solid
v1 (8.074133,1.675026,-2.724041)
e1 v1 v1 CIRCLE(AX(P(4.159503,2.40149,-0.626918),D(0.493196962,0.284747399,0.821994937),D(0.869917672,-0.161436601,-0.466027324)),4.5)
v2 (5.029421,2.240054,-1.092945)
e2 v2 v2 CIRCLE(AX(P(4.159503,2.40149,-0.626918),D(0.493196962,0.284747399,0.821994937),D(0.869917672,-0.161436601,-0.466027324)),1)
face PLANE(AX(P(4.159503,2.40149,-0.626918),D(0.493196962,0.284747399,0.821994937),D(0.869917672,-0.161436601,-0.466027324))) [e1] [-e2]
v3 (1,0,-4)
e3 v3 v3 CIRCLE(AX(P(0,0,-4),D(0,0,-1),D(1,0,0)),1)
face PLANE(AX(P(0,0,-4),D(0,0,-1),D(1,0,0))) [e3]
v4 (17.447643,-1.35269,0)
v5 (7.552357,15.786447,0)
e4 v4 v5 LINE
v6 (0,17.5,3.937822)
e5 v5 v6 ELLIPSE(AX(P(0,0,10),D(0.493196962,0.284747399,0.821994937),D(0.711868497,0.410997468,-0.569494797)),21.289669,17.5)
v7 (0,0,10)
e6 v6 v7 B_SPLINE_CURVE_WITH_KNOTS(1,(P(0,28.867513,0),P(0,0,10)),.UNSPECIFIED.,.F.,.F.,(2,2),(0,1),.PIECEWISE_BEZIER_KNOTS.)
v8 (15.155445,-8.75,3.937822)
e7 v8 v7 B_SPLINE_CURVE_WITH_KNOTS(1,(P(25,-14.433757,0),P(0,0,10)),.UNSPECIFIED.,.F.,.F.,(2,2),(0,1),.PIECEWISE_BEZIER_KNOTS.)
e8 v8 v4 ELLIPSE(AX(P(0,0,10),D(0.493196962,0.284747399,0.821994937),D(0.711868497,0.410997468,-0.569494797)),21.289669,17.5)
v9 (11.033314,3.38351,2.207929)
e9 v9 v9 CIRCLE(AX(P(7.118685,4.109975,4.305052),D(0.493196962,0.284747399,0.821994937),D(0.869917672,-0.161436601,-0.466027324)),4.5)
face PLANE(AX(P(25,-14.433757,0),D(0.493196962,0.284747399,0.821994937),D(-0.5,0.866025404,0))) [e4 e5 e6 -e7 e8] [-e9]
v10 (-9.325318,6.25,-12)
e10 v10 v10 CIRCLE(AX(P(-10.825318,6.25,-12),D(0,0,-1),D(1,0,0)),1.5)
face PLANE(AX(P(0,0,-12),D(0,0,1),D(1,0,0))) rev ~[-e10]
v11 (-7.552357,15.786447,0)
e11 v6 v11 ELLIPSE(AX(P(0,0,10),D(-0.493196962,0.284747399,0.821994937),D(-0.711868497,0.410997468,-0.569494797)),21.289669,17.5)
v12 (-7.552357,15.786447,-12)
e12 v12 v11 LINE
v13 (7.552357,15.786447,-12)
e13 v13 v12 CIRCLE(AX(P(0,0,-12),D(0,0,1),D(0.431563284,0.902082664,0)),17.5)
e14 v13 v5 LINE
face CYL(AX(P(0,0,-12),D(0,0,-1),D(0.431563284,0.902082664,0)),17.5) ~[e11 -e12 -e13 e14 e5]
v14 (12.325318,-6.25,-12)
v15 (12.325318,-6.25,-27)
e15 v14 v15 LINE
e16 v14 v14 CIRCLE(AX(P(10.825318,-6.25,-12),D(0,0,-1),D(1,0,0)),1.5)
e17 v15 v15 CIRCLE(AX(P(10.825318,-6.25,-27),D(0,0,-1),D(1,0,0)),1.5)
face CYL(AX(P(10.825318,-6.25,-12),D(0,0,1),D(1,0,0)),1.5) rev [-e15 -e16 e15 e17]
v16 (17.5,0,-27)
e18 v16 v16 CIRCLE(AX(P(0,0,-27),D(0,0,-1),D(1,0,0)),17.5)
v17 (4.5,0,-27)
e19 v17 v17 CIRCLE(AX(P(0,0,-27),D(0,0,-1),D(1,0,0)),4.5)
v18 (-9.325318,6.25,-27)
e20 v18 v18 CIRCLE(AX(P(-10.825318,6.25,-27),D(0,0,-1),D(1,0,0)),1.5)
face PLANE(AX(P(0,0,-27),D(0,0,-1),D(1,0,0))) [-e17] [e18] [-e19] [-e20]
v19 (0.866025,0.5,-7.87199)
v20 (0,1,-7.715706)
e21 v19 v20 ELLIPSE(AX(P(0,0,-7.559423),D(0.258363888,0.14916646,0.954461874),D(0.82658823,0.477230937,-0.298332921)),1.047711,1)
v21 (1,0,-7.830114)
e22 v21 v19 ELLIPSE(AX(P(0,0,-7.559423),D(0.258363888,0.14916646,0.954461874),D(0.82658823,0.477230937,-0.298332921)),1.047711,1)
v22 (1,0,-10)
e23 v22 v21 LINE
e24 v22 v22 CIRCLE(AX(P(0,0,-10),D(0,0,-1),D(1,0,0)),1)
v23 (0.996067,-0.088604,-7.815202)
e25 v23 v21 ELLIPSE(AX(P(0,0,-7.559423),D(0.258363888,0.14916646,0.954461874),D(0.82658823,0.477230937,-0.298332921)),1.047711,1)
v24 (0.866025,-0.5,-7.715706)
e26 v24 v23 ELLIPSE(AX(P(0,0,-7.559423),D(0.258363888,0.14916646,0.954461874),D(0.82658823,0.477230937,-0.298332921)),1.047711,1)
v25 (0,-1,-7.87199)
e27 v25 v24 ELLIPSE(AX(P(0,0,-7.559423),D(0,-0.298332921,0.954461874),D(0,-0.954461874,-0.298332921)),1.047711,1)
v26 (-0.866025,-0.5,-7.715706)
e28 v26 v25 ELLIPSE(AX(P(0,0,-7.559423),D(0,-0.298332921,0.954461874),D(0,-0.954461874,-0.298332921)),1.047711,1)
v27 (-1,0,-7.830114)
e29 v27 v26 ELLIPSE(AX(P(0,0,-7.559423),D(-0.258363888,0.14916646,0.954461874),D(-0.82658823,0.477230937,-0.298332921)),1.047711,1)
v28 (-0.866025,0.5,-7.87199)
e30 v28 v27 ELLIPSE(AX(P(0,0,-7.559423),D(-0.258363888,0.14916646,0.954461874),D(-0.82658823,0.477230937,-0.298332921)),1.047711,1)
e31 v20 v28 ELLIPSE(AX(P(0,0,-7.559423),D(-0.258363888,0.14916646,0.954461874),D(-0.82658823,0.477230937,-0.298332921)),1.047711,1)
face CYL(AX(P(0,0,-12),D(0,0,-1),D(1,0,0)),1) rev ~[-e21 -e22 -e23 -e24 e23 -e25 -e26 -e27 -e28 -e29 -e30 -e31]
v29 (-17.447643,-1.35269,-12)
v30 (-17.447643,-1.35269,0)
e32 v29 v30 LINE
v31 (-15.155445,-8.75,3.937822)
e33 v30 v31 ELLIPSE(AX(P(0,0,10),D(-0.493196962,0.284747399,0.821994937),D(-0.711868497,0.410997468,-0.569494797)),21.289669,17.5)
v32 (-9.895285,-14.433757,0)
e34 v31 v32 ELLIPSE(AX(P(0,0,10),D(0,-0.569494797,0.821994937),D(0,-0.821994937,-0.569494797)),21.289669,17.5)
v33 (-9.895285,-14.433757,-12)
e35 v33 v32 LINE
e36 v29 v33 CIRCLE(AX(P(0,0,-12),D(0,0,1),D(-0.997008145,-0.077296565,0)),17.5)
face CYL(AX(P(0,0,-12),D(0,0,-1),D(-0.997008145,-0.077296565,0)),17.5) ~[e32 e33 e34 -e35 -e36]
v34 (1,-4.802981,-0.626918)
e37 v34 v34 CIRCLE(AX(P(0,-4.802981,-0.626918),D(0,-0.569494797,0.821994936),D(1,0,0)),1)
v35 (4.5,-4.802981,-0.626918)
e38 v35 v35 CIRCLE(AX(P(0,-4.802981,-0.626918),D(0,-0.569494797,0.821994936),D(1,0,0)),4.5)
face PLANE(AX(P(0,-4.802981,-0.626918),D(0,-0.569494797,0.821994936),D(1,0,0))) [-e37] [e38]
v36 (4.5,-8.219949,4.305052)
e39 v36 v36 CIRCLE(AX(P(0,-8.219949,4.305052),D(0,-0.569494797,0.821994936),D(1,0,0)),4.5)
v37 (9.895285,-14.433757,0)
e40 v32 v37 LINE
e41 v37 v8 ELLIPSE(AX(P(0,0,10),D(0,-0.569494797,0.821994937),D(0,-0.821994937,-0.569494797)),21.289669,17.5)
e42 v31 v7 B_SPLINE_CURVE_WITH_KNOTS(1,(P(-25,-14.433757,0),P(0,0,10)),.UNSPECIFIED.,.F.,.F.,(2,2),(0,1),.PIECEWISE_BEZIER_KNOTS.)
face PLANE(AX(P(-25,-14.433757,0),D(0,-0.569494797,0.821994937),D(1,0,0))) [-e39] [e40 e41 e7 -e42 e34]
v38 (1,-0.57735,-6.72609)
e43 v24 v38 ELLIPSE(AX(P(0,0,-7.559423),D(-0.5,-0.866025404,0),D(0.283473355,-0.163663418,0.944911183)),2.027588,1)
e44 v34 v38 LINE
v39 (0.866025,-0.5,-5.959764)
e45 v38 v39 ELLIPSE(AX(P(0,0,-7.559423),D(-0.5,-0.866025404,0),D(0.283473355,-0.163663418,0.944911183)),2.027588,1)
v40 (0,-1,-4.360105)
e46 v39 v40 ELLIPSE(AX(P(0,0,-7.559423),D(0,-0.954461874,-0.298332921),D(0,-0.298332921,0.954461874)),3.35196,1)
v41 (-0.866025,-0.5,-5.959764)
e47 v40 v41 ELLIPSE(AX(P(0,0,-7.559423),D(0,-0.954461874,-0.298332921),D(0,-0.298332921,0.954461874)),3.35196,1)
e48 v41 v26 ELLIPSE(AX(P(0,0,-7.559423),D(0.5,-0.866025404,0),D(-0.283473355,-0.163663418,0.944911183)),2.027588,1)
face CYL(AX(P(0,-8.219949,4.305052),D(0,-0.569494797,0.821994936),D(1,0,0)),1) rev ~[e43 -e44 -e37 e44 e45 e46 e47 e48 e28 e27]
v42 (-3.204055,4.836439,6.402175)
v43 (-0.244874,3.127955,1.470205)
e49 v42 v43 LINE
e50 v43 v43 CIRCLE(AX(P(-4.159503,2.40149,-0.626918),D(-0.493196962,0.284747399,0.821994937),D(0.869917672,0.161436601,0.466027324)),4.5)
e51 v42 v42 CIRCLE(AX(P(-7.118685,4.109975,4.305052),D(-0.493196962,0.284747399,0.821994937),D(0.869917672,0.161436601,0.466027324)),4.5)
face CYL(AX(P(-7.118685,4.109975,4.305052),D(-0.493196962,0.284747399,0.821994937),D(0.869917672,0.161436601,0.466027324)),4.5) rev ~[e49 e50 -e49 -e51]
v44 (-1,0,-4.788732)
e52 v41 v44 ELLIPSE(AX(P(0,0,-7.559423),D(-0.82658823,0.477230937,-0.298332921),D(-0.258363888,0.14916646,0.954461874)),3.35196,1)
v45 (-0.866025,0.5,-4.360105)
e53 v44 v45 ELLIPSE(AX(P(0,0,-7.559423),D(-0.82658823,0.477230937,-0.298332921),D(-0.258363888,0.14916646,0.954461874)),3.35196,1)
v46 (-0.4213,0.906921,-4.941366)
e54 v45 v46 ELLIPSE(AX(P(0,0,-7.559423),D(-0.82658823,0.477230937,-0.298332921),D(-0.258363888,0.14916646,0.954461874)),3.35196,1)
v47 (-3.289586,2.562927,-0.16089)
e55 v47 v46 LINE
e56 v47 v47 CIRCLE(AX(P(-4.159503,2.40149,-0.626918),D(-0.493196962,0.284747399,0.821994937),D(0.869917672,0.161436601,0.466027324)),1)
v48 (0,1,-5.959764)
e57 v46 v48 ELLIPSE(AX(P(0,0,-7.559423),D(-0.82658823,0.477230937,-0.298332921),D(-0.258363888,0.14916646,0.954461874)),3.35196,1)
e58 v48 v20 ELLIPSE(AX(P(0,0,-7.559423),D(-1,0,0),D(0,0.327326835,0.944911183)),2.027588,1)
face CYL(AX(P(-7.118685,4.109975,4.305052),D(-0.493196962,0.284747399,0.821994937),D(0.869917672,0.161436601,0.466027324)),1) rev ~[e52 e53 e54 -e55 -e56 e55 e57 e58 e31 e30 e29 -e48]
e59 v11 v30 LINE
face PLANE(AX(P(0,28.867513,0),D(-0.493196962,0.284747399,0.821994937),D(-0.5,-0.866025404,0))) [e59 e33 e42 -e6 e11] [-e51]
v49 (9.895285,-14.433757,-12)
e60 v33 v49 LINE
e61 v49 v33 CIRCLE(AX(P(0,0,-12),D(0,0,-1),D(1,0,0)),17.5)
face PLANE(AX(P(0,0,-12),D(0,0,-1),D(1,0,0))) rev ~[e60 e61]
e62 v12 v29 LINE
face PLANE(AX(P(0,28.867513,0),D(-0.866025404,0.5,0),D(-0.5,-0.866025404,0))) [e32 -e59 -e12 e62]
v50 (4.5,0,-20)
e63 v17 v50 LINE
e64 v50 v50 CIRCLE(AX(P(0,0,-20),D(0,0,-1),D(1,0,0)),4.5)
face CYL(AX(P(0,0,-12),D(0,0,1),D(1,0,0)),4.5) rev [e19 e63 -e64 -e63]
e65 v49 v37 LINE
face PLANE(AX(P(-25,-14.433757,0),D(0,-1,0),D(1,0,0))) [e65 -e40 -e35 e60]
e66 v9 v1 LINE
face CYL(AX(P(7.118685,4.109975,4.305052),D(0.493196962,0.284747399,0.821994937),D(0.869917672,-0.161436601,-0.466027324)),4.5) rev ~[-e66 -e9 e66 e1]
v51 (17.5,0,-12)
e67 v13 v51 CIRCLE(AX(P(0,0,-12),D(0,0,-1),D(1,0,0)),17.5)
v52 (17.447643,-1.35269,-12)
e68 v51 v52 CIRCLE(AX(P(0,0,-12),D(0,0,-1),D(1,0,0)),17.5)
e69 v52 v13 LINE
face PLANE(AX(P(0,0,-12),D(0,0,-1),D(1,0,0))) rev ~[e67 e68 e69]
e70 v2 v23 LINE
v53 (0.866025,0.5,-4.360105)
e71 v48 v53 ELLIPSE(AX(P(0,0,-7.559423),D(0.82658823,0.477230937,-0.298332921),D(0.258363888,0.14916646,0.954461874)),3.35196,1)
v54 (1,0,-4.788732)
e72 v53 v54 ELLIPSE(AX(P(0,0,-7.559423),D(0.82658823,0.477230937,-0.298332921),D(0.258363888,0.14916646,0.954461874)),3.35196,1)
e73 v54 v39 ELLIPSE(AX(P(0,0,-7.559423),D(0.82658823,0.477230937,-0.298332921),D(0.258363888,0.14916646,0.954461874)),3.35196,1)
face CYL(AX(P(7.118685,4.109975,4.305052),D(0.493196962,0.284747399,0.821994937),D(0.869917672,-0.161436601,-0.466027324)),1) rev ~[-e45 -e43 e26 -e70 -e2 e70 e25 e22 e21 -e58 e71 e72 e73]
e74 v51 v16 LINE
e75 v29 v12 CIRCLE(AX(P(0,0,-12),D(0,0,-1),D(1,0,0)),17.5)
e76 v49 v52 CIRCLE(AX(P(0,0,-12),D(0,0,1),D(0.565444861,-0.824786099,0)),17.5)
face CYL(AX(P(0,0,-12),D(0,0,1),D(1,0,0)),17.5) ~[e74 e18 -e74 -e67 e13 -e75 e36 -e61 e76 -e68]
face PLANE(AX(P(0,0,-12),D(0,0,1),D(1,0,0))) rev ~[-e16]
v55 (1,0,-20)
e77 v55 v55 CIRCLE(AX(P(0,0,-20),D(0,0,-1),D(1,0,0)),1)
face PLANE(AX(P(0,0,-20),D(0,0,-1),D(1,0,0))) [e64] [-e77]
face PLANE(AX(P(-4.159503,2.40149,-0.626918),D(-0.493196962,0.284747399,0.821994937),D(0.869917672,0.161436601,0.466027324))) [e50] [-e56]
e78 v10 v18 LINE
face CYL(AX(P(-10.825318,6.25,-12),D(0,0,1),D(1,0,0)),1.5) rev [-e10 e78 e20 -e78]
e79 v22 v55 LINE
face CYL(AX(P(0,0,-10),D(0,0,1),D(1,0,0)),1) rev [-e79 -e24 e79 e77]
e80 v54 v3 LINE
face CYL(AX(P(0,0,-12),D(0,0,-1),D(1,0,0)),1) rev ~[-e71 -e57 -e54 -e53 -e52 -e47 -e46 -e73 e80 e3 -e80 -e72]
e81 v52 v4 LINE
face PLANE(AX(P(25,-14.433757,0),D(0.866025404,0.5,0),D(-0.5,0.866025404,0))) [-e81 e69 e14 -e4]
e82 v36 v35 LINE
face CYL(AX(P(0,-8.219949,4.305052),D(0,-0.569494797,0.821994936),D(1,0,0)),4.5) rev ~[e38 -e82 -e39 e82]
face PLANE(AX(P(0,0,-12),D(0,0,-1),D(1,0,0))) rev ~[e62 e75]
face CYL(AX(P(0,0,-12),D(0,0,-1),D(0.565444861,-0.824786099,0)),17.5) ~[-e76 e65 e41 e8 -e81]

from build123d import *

# Parameters (mm, degrees)
F3_DEPTH       = 12
F8_R           = 1
F9_DEPTH       = 8
F10_R          = 4.5
F11_DEPTH      = 2
F12_R          = 1
F13_REACH      = 37.3532145158
F12_R_2        = 4.5
F14_DEPTH      = 6
F16_END_RADIUS = 1
F15_R          = 1
F16_REACH      = 37.3532145367
F15_R_2        = 4.5
F17_DEPTH      = 6
F19_END_RADIUS = 1
F18_R          = 1
F19_REACH      = 37.3532145367
F18_R_2        = 4.5
F20_DEPTH      = 6
F22_DEPTH      = 25
F23_R          = 17.5
F23_R_2        = 1.5
F23_R_3        = 6.5
F23_R_4        = 4.5
F24_DEPTH      = 15
F25_DEPTH      = 10


with BuildPart() as f3:
    # F2 (on Top) → F3 (new body)
    with BuildSketch(Plane.XY):
        Polygon((25, -14.4337567297), (0, 28.8675134595), (-25, -14.4337567297), align=None)
    extrude(amount=-F3_DEPTH)

    # F3_face (on face) → F6 section 0
    with BuildSketch(Plane.XY, mode=Mode.PRIVATE) as f6_s0:
        Polygon((-25, -14.4337567297), (25, -14.4337567297), (0, 28.8675134595), align=None)
    loft([f6_s0.sketch, Vertex(0, 0, 10)])

    # F8 (on face) → F9 (cut)
    with BuildSketch(Plane(origin=(0, 0, -12), x_dir=(1, 0, 0), z_dir=(0, 0, -1))):
        Circle(F8_R)
    extrude(amount=-F9_DEPTH, mode=Mode.SUBTRACT)

    # F10 (on face) → F11 (cut)
    with BuildSketch(Plane(origin=(0, 0, -12), x_dir=(1, 0, 0), z_dir=(0, 0, -1))):
        Circle(F10_R)
    extrude(amount=-F11_DEPTH, mode=Mode.SUBTRACT)

    f13_end = f3.faces().sort_by_distance((-1, 0, -7))[0]
    # F12 (on face) → F13 (cut, up to a face of the model that its end follows)
    with BuildSketch(Plane(origin=(0, -4.6812183988, 6.7567567568), x_dir=(1, 0, 0), z_dir=(0, -0.5694947975, 0.8219949365))):
        with Locations((0, -4.3050520255)):
            Circle(F12_R)
    f13_long = extrude(amount=-F13_REACH, mode=Mode.PRIVATE)
    add(split(f13_long, bisect_by=f13_end, keep=Keep.BOTTOM, mode=Mode.PRIVATE), mode=Mode.SUBTRACT)

    # F12 (on face) → F14 (cut)
    with BuildSketch(Plane(origin=(0, -4.6812183988, 6.7567567568), x_dir=(1, 0, 0), z_dir=(0, -0.5694947975, 0.8219949365))):
        with Locations((0, -4.3050520255)):
            Circle(F12_R_2)
        with Locations((0, -4.3050520255)):
            Circle(F12_R, mode=Mode.SUBTRACT)
    extrude(amount=-F14_DEPTH, mode=Mode.SUBTRACT)

    f16_end = (Plane(origin=(0, 0, -7), x_dir=(-1, 0, 0), z_dir=(0, 0, -1)) * Cylinder(F16_END_RADIUS, 214.1194850146, mode=Mode.PRIVATE)).faces().sort_by_distance((-1, 0, -7))[0]
    # F15 (on face) → F16 (cut, up to the whole of a round face its end follows)
    with BuildSketch(Plane(origin=(-4.0540540541, 2.3406091994, 6.7567567568), x_dir=(0.8699176724, 0.1614366008, 0.4660273245), z_dir=(-0.4931969619, 0.2847473987, 0.8219949365))):
        with Locations((-3.5228976388, 2.474401982)):
            Circle(F15_R)
    f16_long = extrude(amount=-F16_REACH, mode=Mode.PRIVATE)
    add(split(f16_long, bisect_by=f16_end, keep=Keep.ALL, mode=Mode.PRIVATE).solids().sort_by_distance((-7.1186849681, 4.1099746826, 4.3050520255))[0], mode=Mode.SUBTRACT)

    # F15 (on face) → F17 (cut)
    with BuildSketch(Plane(origin=(-4.0540540541, 2.3406091994, 6.7567567568), x_dir=(0.8699176724, 0.1614366008, 0.4660273245), z_dir=(-0.4931969619, 0.2847473987, 0.8219949365))):
        with Locations((-3.5228976388, 2.474401982)):
            Circle(F15_R_2)
        with Locations((-3.5228976388, 2.474401982)):
            Circle(F15_R, mode=Mode.SUBTRACT)
    extrude(amount=-F17_DEPTH, mode=Mode.SUBTRACT)

    f19_end = (Plane(origin=(0, 0, -7), x_dir=(-1, 0, 0), z_dir=(0, 0, -1)) * Cylinder(F19_END_RADIUS, 214.1194850146, mode=Mode.PRIVATE)).faces().sort_by_distance((-1, 0, -9.9336675042))[0]
    # F18 (on face) → F19 (cut, up to the whole of a round face its end follows)
    with BuildSketch(Plane(origin=(4.0540540541, 2.3406091994, 6.7567567568), x_dir=(0.8699176724, -0.1614366008, -0.4660273245), z_dir=(0.4931969619, 0.2847473987, 0.8219949365))):
        with Locations((3.5228976388, 2.474401982)):
            Circle(F18_R)
    f19_long = extrude(amount=-F19_REACH, mode=Mode.PRIVATE)
    add(split(f19_long, bisect_by=f19_end, keep=Keep.ALL, mode=Mode.PRIVATE).solids().sort_by_distance((7.1186849681, 4.1099746826, 4.3050520255))[0], mode=Mode.SUBTRACT)

    # F18 (on face) → F20 (cut)
    with BuildSketch(Plane(origin=(4.0540540541, 2.3406091994, 6.7567567568), x_dir=(0.8699176724, -0.1614366008, -0.4660273245), z_dir=(0.4931969619, 0.2847473987, 0.8219949365))):
        with Locations((3.5228976388, 2.474401982)):
            Circle(F18_R_2)
        with Locations((3.5228976388, 2.474401982)):
            Circle(F18_R, mode=Mode.SUBTRACT)
    extrude(amount=-F20_DEPTH, mode=Mode.SUBTRACT)

    # F21 (on face) → F22 (cut)
    with BuildSketch(Plane(origin=(0, 0, -12), x_dir=(1, 0, 0), z_dir=(0, 0, -1))):
        with BuildLine():
            Line((3.2541491538, -23.2311617897), (7.5523574637, -15.7864466154))
            ThreePointArc((7.5523574637, -15.7864466154), (0, -17.5), (-7.5523574637, -15.7864466154))
            Line((-7.5523574637, -15.7864466154), (-3.2541491538, -23.2311617897))
            ThreePointArc((-3.2541491538, -23.2311617897), (0, -23.4579701768), (3.2541491538, -23.2311617897))
        make_face()
        with BuildLine():
            ThreePointArc((-9.8952850725, 14.4337567297), (0, 17.5), (9.8952850725, 14.4337567297))
            Line((9.8952850725, 14.4337567297), (18.4917016925, 14.4337567297))
            ThreePointArc((18.4917016925, 14.4337567297), (0, 23.4579701768), (-18.4917016925, 14.4337567297))
            Line((-18.4917016925, 14.4337567297), (-9.8952850725, 14.4337567297))
        make_face()
        with BuildLine():
            ThreePointArc((-17.4476425363, 1.3526898856), (-15.1554445662, 8.75), (-9.8952850725, 14.4337567297))
            Line((-9.8952850725, 14.4337567297), (-18.4917016925, 14.4337567297))
            ThreePointArc((-18.4917016925, 14.4337567297), (-20.3151980943, 11.7289850884), (-21.7458508462, 8.79740506))
            Line((-21.7458508462, 8.79740506), (-17.4476425363, 1.3526898856))
        make_face()
        with BuildLine():
            ThreePointArc((9.8952850725, 14.4337567297), (15.1554445662, 8.75), (17.4476425363, 1.3526898856))
            Line((17.4476425363, 1.3526898856), (21.7458508462, 8.79740506))
            ThreePointArc((21.7458508462, 8.79740506), (20.3151980943, 11.7289850884), (18.4917016925, 14.4337567297))
            Line((18.4917016925, 14.4337567297), (9.8952850725, 14.4337567297))
        make_face()
        with BuildLine():
            Line((0, -28.8675134595), (3.2541491538, -23.2311617897))
            ThreePointArc((3.2541491538, -23.2311617897), (0, -23.4579701768), (-3.2541491538, -23.2311617897))
            Line((-3.2541491538, -23.2311617897), (0, -28.8675134595))
        make_face()
        with BuildLine():
            ThreePointArc((-21.7458508462, 8.79740506), (-20.3151980943, 11.7289850884), (-18.4917016925, 14.4337567297))
            Line((-18.4917016925, 14.4337567297), (-25, 14.4337567297))
            Line((-25, 14.4337567297), (-21.7458508462, 8.79740506))
        make_face()
        with BuildLine():
            ThreePointArc((18.4917016925, 14.4337567297), (20.3151980943, 11.7289850884), (21.7458508462, 8.79740506))
            Line((21.7458508462, 8.79740506), (25, 14.4337567297))
            Line((25, 14.4337567297), (18.4917016925, 14.4337567297))
        make_face()
    extrude(amount=-F22_DEPTH, mode=Mode.SUBTRACT)

    # F23 (on face) → F24 (join)
    with BuildSketch(Plane(origin=(0, 0, -12), x_dir=(1, 0, 0), z_dir=(0, 0, -1))):
        Circle(F23_R)
        with Locations((-10.8253175473, -6.25)):
            Circle(F23_R_2, mode=Mode.SUBTRACT)
        Circle(F23_R_3, mode=Mode.SUBTRACT)
        with Locations((10.8253175473, 6.25)):
            Circle(F23_R_2, mode=Mode.SUBTRACT)
        Circle(F23_R_3)
        Circle(F23_R_4, mode=Mode.SUBTRACT)
    extrude(amount=F24_DEPTH)

    # F25 (add): a face of the model
    f25_faces = [f3.faces().sort_by_distance(p)[0] for p in [
        (-4.3727207794, 0, -10),
    ]]
    extrude(f25_faces, amount=F25_DEPTH)


solid = f3.part
